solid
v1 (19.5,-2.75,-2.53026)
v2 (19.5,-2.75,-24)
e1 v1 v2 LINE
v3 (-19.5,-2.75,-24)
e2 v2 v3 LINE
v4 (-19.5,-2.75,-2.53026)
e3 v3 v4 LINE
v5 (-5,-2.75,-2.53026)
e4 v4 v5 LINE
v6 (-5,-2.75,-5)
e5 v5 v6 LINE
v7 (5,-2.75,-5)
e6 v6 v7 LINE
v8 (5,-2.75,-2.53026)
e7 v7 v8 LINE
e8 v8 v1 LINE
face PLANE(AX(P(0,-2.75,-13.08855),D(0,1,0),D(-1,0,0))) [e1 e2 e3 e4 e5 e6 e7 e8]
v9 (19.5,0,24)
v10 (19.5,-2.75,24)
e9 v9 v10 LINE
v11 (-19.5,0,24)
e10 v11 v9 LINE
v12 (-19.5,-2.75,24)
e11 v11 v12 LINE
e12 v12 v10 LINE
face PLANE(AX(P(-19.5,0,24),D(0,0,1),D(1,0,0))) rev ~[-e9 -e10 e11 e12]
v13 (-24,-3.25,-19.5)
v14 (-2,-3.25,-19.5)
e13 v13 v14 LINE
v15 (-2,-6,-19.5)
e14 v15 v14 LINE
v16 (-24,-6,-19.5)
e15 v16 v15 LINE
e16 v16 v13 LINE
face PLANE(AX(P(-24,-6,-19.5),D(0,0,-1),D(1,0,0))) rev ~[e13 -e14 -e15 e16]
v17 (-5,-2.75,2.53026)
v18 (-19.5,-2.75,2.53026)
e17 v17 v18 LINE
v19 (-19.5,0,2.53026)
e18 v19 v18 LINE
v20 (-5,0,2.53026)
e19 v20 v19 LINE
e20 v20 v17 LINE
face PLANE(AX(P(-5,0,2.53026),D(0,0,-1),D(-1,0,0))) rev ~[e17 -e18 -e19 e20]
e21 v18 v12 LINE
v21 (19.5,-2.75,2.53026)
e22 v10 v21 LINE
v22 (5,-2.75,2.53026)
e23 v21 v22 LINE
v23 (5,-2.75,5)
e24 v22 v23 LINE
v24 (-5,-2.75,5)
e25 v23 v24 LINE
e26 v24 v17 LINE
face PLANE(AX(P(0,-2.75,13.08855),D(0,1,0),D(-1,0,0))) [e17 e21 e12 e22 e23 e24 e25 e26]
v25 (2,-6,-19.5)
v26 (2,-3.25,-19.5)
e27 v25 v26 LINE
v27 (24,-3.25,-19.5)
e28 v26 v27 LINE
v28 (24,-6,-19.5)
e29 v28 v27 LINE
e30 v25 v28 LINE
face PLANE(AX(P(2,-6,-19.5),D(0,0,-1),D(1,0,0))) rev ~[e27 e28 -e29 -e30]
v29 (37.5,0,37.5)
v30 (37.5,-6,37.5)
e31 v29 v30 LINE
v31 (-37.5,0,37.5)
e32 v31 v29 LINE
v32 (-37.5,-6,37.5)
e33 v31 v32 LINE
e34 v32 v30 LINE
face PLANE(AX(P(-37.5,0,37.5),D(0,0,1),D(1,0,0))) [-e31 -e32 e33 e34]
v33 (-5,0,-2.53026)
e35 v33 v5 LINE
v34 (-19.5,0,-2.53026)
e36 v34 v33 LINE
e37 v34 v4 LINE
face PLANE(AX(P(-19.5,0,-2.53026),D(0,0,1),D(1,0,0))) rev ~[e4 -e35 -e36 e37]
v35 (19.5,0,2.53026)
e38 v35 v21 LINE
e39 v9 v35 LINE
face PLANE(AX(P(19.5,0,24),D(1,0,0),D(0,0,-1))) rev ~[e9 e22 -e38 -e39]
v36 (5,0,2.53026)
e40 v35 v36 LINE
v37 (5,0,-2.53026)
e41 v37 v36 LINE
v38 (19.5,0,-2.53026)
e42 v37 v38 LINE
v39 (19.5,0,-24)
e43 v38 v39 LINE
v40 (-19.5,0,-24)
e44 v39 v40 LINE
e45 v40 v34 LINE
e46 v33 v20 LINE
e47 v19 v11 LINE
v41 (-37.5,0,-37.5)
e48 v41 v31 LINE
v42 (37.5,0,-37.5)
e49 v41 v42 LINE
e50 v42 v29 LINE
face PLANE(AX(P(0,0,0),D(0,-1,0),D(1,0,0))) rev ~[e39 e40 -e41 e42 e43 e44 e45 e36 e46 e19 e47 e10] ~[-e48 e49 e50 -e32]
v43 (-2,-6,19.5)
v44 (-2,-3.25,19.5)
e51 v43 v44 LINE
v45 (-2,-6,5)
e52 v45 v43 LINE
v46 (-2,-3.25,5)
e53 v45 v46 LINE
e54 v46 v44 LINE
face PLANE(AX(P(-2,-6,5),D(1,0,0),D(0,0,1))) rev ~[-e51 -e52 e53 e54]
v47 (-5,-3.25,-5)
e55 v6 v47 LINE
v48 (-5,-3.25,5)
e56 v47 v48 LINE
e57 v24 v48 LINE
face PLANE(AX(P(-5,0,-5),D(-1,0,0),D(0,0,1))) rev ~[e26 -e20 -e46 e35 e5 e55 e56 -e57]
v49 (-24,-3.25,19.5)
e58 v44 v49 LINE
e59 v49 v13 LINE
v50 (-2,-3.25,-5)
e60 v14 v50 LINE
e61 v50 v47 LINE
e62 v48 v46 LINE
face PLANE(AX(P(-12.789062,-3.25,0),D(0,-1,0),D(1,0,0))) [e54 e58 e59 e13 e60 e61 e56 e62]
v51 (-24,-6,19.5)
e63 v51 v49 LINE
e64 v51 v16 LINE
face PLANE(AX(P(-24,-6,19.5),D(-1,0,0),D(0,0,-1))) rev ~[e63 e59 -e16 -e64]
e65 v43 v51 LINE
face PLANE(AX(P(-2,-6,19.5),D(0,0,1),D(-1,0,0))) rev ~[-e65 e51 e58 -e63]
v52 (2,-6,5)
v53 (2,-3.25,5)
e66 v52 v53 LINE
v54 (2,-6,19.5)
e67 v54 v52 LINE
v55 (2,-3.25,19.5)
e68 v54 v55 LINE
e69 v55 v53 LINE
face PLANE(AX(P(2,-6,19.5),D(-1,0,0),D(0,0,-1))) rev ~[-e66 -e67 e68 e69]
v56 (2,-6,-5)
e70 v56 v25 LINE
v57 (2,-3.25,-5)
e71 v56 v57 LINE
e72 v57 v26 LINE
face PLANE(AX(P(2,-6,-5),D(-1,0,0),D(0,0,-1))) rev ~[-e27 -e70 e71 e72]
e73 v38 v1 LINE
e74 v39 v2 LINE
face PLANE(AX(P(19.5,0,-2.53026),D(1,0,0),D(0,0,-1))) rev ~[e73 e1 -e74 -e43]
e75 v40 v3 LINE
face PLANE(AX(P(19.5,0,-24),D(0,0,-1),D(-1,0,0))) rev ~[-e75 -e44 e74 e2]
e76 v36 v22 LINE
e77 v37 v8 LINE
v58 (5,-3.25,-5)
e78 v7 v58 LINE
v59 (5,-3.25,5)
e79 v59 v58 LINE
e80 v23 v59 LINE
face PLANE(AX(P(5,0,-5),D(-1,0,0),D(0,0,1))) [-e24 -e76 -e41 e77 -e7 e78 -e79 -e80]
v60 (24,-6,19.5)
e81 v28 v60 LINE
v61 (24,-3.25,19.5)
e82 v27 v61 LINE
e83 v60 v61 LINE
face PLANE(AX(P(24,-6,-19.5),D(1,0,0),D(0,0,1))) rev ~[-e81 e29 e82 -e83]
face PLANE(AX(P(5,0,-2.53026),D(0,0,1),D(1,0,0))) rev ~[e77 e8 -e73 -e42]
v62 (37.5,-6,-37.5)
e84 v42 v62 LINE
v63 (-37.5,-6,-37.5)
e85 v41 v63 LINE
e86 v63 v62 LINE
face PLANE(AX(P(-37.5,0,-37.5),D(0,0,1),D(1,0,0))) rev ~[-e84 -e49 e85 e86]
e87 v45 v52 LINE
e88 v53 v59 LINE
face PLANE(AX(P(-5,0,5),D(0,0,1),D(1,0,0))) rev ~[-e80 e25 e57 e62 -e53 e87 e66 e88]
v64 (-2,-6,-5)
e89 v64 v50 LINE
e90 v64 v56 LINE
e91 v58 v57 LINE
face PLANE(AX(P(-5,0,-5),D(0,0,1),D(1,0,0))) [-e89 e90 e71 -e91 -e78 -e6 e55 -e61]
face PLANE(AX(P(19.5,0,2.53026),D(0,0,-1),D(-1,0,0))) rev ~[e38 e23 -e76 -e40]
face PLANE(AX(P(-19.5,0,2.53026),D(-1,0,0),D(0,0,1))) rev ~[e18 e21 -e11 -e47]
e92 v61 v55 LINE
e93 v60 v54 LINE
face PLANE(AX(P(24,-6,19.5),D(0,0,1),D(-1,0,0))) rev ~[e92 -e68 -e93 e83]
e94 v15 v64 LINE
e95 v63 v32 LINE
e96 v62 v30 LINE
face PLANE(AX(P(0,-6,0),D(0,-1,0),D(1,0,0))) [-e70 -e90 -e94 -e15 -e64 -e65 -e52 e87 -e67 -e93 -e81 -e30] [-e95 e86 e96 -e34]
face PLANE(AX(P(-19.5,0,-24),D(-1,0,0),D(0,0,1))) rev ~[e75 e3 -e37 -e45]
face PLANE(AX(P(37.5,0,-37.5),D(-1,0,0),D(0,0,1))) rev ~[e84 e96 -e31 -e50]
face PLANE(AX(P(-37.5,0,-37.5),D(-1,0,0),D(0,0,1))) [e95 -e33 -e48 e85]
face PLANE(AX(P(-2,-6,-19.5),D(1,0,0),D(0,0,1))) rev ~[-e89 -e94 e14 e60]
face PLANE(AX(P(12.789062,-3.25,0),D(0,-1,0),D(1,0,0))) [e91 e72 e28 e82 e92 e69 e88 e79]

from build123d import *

# Parameters (mm, degrees)
F0_W     = 75
F0_H     = 75
F0_W_2   = 10
F0_H_2   = 10
F1_DEPTH = 6
F3_DEPTH = 2.75
F5_DEPTH = 2.75


# Not quite as in the source:
# - a feature names something its author has since deleted; it is built from what else it names


with BuildPart() as f1:
    # F0 (on Front) → F1 (new body)
    with BuildSketch(Plane.XZ):
        Rectangle(F0_W, F0_H)
        Rectangle(F0_W_2, F0_H_2, mode=Mode.SUBTRACT)
    extrude(amount=F1_DEPTH)

    # F2 (on face) → F3 (cut)
    with BuildSketch(Plane.XZ.offset(6)):
        Polygon((-24, -19.5), (-2, -19.5), (-2, -5), (-5, -5), (-5, 5), (-2, 5), (-2, 19.5), (-24, 19.5), align=None)
        Polygon((2, -19.5), (24, -19.5), (24, 19.5), (2, 19.5), (2, 5), (5, 5), (5, -5), (2, -5), align=None)
    extrude(amount=-F3_DEPTH, mode=Mode.SUBTRACT)

    # F4 (on face) → F5 (cut)
    with BuildSketch(Plane(origin=(0, 0, 0), x_dir=(-1, 0, 0), z_dir=(0, 1, 0))):
        Polygon((-19.5, -24), (19.5, -24), (19.5, -2.5302600116), (5, -2.5302600116), (5, -5), (-5, -5), (-5, -2.5302600116), (-19.5, -2.5302600116), align=None)
        Polygon((5, 2.5302600116), (19.5, 2.5302600116), (19.5, 24), (-19.5, 24), (-19.5, 2.5302600116), (-5, 2.5302600116), (-5, 5), (5, 5), align=None)
    extrude(amount=-F5_DEPTH, mode=Mode.SUBTRACT)


solid = f1.part
